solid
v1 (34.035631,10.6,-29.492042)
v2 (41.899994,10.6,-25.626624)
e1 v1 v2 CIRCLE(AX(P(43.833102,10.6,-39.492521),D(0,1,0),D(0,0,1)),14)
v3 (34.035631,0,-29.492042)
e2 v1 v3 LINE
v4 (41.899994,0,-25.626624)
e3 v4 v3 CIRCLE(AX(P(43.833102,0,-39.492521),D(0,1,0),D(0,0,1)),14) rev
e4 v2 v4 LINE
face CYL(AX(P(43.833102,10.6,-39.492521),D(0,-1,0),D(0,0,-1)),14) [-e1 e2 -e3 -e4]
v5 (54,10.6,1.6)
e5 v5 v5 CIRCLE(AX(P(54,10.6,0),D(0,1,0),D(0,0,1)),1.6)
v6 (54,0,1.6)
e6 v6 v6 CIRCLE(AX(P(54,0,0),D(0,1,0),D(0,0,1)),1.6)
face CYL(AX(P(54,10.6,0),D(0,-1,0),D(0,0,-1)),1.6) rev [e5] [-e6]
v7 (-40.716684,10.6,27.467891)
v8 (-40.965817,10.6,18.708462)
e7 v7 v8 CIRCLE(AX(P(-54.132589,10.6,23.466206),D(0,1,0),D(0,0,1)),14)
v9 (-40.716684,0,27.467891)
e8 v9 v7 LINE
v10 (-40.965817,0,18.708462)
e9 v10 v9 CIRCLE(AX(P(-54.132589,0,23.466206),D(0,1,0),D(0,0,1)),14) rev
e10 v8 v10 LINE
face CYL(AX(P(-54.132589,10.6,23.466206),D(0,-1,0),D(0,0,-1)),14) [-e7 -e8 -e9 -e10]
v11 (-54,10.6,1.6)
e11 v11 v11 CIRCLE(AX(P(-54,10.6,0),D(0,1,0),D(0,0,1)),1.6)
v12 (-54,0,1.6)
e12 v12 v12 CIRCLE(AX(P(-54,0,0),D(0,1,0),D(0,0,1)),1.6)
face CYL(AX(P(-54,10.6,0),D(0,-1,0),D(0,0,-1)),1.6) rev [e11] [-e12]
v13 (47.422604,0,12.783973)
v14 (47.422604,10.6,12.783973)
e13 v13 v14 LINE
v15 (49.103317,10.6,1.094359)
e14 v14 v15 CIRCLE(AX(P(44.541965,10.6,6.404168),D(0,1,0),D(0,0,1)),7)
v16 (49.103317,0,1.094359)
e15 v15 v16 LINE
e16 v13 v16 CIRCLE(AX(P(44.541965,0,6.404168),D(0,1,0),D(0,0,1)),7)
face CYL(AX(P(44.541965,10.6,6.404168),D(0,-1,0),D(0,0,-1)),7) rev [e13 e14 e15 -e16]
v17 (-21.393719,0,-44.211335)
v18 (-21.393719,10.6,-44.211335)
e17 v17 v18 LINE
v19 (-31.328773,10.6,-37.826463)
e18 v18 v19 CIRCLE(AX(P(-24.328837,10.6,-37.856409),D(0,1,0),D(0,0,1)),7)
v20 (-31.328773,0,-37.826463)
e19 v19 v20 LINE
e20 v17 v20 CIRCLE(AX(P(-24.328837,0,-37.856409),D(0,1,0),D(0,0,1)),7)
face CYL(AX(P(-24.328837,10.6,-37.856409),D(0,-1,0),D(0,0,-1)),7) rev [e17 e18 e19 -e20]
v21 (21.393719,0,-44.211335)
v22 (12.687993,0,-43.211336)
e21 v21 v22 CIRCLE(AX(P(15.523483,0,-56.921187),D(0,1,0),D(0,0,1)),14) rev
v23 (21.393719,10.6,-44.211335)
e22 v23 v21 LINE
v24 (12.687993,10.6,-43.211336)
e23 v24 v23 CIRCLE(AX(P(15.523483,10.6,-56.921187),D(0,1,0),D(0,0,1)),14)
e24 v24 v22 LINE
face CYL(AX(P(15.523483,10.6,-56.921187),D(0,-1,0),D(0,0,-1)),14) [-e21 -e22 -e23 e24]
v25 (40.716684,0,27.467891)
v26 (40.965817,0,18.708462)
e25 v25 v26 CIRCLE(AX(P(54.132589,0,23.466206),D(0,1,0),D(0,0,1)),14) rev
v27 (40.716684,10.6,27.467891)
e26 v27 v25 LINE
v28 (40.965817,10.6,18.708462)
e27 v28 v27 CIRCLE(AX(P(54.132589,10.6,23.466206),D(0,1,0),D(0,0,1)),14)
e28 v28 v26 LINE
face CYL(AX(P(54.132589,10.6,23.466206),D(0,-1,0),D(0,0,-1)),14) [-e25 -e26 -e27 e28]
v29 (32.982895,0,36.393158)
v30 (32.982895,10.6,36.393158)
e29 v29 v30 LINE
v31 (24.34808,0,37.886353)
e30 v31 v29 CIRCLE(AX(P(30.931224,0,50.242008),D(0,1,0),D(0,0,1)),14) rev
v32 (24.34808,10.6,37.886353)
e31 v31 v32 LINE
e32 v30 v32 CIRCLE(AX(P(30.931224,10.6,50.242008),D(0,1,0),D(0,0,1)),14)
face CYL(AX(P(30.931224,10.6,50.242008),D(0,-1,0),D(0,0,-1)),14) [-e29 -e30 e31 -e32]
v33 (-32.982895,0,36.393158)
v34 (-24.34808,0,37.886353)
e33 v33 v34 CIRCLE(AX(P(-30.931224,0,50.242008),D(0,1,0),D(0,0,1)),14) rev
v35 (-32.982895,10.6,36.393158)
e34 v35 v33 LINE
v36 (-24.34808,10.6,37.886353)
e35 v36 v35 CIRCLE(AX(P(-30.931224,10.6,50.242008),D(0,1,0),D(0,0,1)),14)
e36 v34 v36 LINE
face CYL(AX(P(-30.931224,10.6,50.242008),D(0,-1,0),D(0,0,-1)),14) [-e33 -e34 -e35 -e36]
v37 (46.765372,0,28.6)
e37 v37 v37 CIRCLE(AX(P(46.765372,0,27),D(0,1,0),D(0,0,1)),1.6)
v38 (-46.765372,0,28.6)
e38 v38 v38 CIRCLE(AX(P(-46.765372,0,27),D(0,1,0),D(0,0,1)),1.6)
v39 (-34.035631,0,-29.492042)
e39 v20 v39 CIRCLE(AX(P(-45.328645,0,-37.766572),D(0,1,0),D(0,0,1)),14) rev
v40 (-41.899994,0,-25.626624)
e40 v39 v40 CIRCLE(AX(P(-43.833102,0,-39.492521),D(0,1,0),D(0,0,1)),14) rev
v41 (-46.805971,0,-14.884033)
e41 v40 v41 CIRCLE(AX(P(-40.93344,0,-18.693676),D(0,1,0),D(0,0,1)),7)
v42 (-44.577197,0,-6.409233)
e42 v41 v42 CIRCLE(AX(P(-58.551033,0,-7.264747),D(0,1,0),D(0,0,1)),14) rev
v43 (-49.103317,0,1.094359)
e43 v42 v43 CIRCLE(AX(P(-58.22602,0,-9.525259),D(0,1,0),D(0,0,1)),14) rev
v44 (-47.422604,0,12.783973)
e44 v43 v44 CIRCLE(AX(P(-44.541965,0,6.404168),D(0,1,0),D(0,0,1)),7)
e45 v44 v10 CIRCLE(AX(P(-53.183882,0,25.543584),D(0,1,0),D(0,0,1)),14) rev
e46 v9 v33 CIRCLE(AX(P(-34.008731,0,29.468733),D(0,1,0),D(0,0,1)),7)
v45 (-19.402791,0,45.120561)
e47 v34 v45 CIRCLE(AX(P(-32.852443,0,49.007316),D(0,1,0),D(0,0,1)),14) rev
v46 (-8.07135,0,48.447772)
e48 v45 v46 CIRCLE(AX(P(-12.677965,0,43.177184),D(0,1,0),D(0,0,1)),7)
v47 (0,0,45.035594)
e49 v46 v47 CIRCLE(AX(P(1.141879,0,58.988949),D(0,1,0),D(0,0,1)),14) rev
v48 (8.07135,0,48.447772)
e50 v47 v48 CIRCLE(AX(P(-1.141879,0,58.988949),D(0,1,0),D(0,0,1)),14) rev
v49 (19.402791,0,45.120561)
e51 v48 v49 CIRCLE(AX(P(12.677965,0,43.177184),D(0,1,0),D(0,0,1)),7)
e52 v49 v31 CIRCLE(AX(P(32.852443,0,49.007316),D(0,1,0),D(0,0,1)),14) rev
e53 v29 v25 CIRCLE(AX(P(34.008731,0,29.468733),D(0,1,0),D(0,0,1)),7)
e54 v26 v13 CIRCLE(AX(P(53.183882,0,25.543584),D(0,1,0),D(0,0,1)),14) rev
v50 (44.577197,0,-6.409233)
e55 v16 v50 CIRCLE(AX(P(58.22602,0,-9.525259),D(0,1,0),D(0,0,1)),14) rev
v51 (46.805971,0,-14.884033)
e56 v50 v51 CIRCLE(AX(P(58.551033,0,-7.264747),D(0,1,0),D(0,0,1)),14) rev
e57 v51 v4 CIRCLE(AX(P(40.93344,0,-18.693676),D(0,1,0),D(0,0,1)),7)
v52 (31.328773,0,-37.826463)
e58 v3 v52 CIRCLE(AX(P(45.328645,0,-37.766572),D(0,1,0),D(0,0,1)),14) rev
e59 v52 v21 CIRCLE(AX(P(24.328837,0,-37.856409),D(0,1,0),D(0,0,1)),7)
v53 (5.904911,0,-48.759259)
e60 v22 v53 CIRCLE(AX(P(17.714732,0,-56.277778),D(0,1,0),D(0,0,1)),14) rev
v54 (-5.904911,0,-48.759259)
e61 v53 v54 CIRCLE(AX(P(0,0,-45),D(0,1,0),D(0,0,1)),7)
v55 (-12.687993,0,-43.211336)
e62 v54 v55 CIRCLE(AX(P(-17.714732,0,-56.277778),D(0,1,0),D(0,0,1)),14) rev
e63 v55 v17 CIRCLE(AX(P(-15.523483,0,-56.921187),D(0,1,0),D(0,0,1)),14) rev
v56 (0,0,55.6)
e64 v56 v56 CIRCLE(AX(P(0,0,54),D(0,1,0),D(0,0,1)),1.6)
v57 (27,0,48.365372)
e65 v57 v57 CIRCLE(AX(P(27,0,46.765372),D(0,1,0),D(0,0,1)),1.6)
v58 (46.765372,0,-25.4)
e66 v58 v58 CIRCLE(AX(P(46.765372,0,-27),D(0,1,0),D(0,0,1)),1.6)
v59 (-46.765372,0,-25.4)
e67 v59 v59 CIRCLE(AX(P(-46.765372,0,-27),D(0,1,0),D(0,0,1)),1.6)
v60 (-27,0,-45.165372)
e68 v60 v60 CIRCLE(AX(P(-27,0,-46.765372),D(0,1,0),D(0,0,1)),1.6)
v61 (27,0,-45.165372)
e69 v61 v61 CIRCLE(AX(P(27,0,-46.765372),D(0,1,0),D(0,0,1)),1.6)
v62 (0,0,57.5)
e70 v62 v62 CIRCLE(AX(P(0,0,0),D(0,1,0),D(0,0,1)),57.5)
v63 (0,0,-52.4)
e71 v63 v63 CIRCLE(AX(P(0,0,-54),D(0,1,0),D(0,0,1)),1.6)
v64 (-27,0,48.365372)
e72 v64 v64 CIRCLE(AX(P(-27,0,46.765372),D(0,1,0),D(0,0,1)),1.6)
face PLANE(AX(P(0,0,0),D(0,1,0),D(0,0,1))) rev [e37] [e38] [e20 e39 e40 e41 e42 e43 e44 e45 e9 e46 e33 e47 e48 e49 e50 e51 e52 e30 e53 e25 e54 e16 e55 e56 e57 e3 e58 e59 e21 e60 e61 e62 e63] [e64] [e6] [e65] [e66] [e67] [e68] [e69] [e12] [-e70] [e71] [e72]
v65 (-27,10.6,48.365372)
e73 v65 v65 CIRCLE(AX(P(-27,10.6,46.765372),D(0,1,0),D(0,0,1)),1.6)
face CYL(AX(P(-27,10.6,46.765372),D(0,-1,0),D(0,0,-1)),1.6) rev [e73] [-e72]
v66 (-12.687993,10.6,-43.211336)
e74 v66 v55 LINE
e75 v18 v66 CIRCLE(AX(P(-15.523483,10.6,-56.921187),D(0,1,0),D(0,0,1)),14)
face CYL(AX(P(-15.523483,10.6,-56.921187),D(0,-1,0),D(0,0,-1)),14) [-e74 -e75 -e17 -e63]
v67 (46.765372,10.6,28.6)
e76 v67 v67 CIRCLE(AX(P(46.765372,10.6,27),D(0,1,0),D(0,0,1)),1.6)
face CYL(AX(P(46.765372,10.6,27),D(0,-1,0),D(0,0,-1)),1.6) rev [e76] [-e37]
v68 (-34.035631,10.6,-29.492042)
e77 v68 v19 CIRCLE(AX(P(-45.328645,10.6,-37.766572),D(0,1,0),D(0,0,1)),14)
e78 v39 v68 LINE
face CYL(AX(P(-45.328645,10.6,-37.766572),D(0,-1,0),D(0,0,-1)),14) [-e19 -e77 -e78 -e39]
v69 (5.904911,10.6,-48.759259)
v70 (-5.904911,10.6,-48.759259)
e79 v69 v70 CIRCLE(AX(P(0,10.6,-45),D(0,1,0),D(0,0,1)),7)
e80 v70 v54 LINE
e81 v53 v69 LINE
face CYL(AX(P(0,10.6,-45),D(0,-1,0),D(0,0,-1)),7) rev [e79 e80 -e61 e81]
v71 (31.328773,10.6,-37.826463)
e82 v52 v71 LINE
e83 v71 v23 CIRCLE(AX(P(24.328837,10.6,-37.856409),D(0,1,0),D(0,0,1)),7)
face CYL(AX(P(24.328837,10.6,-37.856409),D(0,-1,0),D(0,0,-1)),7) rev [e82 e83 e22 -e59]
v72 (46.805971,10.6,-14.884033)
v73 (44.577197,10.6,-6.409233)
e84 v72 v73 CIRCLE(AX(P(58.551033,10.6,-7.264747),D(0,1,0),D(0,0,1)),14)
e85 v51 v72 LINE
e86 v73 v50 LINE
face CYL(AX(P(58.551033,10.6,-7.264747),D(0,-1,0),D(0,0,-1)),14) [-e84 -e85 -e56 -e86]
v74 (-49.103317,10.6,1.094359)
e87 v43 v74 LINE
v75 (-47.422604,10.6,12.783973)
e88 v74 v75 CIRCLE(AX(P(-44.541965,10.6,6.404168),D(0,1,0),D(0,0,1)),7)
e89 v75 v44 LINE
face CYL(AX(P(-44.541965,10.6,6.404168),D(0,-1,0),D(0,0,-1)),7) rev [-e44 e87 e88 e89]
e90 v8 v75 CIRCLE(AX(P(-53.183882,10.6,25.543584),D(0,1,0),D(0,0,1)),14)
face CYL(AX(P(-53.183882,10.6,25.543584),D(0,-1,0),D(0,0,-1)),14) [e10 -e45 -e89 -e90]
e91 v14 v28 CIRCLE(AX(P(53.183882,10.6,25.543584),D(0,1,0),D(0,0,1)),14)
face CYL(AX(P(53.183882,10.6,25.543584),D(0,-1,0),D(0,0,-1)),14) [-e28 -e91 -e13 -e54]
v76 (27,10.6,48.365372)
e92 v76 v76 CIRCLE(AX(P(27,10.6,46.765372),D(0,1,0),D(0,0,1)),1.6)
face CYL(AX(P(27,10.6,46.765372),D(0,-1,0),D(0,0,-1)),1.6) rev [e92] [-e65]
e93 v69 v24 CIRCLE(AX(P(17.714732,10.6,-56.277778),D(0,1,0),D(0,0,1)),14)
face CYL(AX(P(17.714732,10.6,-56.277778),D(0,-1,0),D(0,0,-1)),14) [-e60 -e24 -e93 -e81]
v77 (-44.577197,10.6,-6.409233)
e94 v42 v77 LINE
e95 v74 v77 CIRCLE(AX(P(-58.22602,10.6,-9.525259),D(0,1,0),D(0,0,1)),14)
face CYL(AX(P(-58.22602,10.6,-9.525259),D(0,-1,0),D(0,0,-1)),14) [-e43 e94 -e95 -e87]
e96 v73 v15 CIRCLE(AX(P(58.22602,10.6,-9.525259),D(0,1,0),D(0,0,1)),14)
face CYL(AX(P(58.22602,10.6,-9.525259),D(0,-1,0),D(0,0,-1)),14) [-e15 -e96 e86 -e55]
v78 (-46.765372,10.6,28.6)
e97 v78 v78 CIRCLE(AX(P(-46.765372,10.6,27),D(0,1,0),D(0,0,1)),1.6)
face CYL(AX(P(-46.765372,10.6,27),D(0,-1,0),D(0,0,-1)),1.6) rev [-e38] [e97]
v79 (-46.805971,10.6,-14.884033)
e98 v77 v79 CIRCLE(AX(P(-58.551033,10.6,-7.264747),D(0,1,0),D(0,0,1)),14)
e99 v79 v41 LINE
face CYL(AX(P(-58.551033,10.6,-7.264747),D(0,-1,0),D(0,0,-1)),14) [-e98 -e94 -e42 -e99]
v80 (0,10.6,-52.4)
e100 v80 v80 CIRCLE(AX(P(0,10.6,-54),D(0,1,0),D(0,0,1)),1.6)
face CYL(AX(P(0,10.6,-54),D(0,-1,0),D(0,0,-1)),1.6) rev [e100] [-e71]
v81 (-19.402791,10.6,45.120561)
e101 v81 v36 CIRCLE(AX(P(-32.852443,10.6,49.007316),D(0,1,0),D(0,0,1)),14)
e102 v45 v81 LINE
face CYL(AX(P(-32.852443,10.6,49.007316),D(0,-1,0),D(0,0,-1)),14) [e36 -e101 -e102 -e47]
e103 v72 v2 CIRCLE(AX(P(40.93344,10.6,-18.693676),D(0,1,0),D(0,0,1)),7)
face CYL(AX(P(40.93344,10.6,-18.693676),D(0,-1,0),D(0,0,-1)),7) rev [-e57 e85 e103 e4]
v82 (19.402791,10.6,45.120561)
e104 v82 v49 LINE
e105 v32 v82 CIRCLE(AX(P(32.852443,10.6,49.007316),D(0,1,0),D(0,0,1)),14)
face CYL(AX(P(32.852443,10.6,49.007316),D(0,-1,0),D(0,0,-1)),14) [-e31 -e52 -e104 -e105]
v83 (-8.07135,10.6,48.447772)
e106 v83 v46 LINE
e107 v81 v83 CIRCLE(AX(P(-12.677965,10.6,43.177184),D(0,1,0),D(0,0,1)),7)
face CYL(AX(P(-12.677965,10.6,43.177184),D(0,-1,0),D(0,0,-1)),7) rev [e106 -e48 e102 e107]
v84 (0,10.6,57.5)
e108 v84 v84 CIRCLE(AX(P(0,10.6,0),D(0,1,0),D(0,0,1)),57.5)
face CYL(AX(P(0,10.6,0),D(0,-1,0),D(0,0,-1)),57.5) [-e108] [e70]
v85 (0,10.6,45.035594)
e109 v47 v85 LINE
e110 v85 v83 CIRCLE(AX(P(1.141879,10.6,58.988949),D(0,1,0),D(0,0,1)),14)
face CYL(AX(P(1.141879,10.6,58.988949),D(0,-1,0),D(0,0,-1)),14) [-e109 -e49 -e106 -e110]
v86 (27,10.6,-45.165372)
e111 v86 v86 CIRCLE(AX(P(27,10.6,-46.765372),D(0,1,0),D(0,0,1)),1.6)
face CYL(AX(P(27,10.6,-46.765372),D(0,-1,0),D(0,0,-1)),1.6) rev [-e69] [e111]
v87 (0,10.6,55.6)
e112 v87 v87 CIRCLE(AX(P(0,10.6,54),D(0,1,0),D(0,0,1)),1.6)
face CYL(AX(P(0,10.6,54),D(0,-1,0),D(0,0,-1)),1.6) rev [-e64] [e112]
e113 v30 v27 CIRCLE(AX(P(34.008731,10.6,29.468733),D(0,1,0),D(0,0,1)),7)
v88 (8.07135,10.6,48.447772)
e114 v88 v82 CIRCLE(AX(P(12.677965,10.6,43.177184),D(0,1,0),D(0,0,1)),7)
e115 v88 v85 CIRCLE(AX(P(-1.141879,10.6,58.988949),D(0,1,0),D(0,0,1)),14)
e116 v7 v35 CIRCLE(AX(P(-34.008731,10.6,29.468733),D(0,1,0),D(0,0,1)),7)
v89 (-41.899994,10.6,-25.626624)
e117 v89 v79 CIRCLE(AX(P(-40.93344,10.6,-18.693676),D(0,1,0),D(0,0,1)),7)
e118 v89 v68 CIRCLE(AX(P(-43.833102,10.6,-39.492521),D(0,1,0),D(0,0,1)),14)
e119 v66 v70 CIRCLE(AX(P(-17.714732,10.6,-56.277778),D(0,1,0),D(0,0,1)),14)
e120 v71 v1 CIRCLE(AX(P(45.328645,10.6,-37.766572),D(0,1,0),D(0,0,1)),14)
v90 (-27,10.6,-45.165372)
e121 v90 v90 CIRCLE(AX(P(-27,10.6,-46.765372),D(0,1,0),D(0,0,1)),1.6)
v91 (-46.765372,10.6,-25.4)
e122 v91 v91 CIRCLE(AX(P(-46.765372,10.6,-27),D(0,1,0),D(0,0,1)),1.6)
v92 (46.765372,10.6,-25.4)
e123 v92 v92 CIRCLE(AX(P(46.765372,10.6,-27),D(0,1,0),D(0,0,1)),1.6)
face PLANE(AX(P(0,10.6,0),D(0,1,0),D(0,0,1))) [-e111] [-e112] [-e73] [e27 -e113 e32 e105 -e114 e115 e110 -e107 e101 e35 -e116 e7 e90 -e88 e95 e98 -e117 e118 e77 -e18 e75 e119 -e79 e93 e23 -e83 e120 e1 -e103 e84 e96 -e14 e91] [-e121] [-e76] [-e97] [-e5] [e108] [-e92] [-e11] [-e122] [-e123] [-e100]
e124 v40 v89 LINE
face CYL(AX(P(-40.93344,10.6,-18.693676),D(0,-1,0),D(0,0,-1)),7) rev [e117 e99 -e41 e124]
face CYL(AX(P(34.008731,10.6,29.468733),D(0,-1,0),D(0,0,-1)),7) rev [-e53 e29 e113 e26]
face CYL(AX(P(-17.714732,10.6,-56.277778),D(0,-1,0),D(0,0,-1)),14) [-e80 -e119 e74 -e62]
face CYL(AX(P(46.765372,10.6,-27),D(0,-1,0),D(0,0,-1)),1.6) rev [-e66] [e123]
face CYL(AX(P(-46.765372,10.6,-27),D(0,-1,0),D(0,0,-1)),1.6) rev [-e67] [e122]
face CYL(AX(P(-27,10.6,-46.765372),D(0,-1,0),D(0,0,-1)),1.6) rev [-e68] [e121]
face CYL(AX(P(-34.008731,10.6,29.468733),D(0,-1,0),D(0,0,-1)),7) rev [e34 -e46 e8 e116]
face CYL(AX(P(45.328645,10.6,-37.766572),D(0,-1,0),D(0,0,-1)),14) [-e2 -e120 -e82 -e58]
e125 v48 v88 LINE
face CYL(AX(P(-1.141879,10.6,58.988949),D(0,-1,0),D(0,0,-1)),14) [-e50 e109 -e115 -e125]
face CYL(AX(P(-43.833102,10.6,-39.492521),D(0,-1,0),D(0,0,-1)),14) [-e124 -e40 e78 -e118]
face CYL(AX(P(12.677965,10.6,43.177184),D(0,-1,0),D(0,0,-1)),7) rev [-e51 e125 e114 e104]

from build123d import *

# Parameters (mm, degrees)
SKETCH1_R           = 57.5
SKETCH1_R_2         = 1.6
BOSS_EXTRUDE1_DEPTH = 10.6
FILLET1_R           = 14


with BuildPart() as part:
    # Sketch1 → Boss-Extrude1 (new body)
    with BuildSketch(Plane(origin=(0, 0, 0), x_dir=(1, 0, 0), z_dir=(0, 1, 0))):
        with Locations(Location((0, 0, 0), (0, 0, 270))):
            Circle(SKETCH1_R)
        with Locations(Location((-27, -46.765371804, 0), (0, 0, 270))):
            Circle(SKETCH1_R_2, mode=Mode.SUBTRACT)
        with Locations(Location((-46.765371804, -27, 0), (0, 0, 270))):
            Circle(SKETCH1_R_2, mode=Mode.SUBTRACT)
        with Locations(Location((-54, 0, 0), (0, 0, 270))):
            Circle(SKETCH1_R_2, mode=Mode.SUBTRACT)
        with Locations(Location((0, -54, 0), (0, 0, 270))):
            Circle(SKETCH1_R_2, mode=Mode.SUBTRACT)
        with Locations(Location((27, -46.765371804, 0), (0, 0, 270))):
            Circle(SKETCH1_R_2, mode=Mode.SUBTRACT)
        with Locations(Location((46.765371804, -27, 0), (0, 0, 270))):
            Circle(SKETCH1_R_2, mode=Mode.SUBTRACT)
        with Locations(Location((-46.765371804, 27, 0), (0, 0, 270))):
            Circle(SKETCH1_R_2, mode=Mode.SUBTRACT)
        with Locations(Location((-27, 46.765371804, 0), (0, 0, 270))):
            Circle(SKETCH1_R_2, mode=Mode.SUBTRACT)
        with BuildLine():
            ThreePointArc((43.337291938, 12.119369929), (44.541964885, 6.404167722), (44.996248187, 0.581075772))
            ThreePointArc((44.996248187, 0.581075772), (49.649801174, -1.617727663), (51.541964885, -6.404167722))
            ThreePointArc((51.541964885, -6.404167722), (48.916629323, -11.868809619), (43.009876012, -13.234446171))
            ThreePointArc((43.009876012, -13.234446171), (40.933439791, -18.693675585), (38.167406032, -23.837976356))
            ThreePointArc((38.167406032, -23.837976356), (40.258159872, -26.3152212), (41.008730846, -29.468733028))
            ThreePointArc((41.008730846, -29.468733028), (36.666623102, -35.944503928), (29.027128345, -34.386419122))
            ThreePointArc((29.027128345, -34.386419122), (24.328836786, -37.856408977), (19.22068214, -40.688639423))
            ThreePointArc((19.22068214, -40.688639423), (19.562695248, -41.91207899), (19.677965058, -43.177183813))
            ThreePointArc((19.677965058, -43.177183813), (13.403758509, -50.139455271), (5.828472525, -44.620946965))
            ThreePointArc((5.828472525, -44.620946965), (0, -45), (-5.828472525, -44.620946965))
            ThreePointArc((-5.828472525, -44.620946965), (-14.650092956, -49.893634628), (-19.22068214, -40.688639423))
            ThreePointArc((-19.22068214, -40.688639423), (-24.328836785, -37.856408977), (-29.027128345, -34.386419122))
            ThreePointArc((-29.027128345, -34.386419122), (-39.298977866, -34.052758165), (-38.167406032, -23.837976356))
            ThreePointArc((-38.167406032, -23.837976356), (-40.933439791, -18.693675585), (-43.009876012, -13.234446171))
            ThreePointArc((-43.009876012, -13.234446171), (-51.470714978, -7.40037159), (-44.996248187, 0.581075772))
            ThreePointArc((-44.996248187, 0.581075772), (-44.541964885, 6.404167722), (-43.337291938, 12.119369929))
            ThreePointArc((-43.337291938, 12.119369929), (-47.300863758, 21.601580676), (-37.539099471, 24.815640449))
            ThreePointArc((-37.539099471, 24.815640449), (-34.008730846, 29.468733028), (-29.905423881, 33.625371708))
            ThreePointArc((-29.905423881, 33.625371708), (-28.113322508, 43.745183707), (-18.163551911, 41.171414622))
            ThreePointArc((-18.163551911, 41.171414622), (-12.677965058, 43.177183813), (-6.978795043, 44.455555556))
            ThreePointArc((-6.978795043, 44.455555556), (-0.272428616, 51.994696752), (7, 45))
            ThreePointArc((7, 45), (6.994696752, 44.727571384), (6.978795043, 44.455555556))
            ThreePointArc((6.978795043, 44.455555556), (12.677965058, 43.177183813), (18.163551911, 41.171414622))
            ThreePointArc((18.163551911, 41.171414622), (26.038077243, 44.644523374), (31.328836786, 37.856408977))
            ThreePointArc((31.328836786, 37.856408977), (30.963447161, 35.624381834), (29.905423881, 33.625371708))
            ThreePointArc((29.905423881, 33.625371708), (34.008730846, 29.468733028), (37.539099471, 24.815640449))
            ThreePointArc((37.539099471, 24.815640449), (44.485876825, 24.725274968), (47.933439791, 18.693675585))
            ThreePointArc((47.933439791, 18.693675585), (46.670467115, 14.68287548), (43.337291938, 12.119369929))
        make_face(mode=Mode.SUBTRACT)
        with Locations(Location((54, 0, 0), (0, 0, 270))):
            Circle(SKETCH1_R_2, mode=Mode.SUBTRACT)
        with Locations(Location((46.765371804, 27, 0), (0, 0, 270))):
            Circle(SKETCH1_R_2, mode=Mode.SUBTRACT)
        with Locations(Location((0, 54, 0), (0, 0, 270))):
            Circle(SKETCH1_R_2, mode=Mode.SUBTRACT)
        with Locations(Location((27, 46.765371804, 0), (0, 0, 270))):
            Circle(SKETCH1_R_2, mode=Mode.SUBTRACT)
    extrude(amount=BOSS_EXTRUDE1_DEPTH)

    # Fillet1
    # the kernel refuses this fillet: 14 mm, written as the material it takes off along each edge
    with BuildSketch(Plane(origin=(43.009876012, -16.77410228, 13.234446171), x_dir=(-0.3645348982341331, 0, 0.9311897271605987), z_dir=(0, 1, 0)), Plane(origin=(43.337291938, -16.77410228, -12.119369929), x_dir=(0.19677290431862063, 0, 0.9804490930823564), z_dir=(0, 1, 0)), Plane(origin=(29.027128345, -16.77410228, 34.386419122), x_dir=(-0.8101054462780665, 0, 0.586284202337582), z_dir=(0, 1, 0)), Plane(origin=(5.828472525, -16.77410228, 44.620946965), x_dir=(-0.9984732390602963, 0, 0.05523758575861507), z_dir=(0, 1, 0)), Plane(origin=(-19.22068214, -16.77410228, 40.688639423), x_dir=(-0.8698328333156817, 0, -0.4933465740085904), z_dir=(0, 1, 0)), Plane(origin=(-38.167406032, -16.77410228, 23.837976356), x_dir=(-0.46502664893844664, 0, -0.8852966823483972), z_dir=(0, 1, 0)), Plane(origin=(-44.996248187, -16.77410228, -0.581075772), x_dir=(0.0874222107554752, 0, -0.99617134925003), z_dir=(0, 1, 0)), Plane(origin=(-37.539099471, -16.77410228, -24.815640449), x_dir=(0.6121151362303556, 0, -0.7907686513751624), z_dir=(0, 1, 0)), Plane(origin=(-18.163551911, -16.77410228, -41.171414622), x_dir=(0.9424658309509625, 0, -0.334302493992958), z_dir=(0, 1, 0)), Plane(origin=(6.978795043, -16.77410228, -44.455555556), x_dir=(0.9735902834899675, 0, 0.22830234316345693), z_dir=(0, 1, 0))) as fillet1_piece_1:
        with BuildLine():
            CenterArc((7.753362832, 13.961040239), FILLET1_R, 225.679308165, 40.045235058)
            ThreePointArc((-2.028069047, 3.944873787), (-0.693306264, 2.137324059), (0, 0))
            ThreePointArc((0, 0), (3.354820456, 0.125227803), (6.709640912, 0))
        make_face()
    extrude(amount=44.14820456, mode=Mode.SUBTRACT)
    with BuildSketch(Plane(origin=(44.996248187, -16.77410228, -0.581075772), x_dir=(0.9259201789863998, 0, 0.37771923719317424), z_dir=(0, 1, 0)), Plane(origin=(37.539099471, -16.77410228, -24.815640449), x_dir=(0.9831440588568181, 0, -0.18283259975874497), z_dir=(0, 1, 0)), Plane(origin=(38.167406032, -16.77410228, 23.837976356), x_dir=(0.5747231845271455, 0, 0.8183478851729116), z_dir=(0, 1, 0)), Plane(origin=(19.22068214, -16.77410228, 40.688639423), x_dir=(0.041055639780420296, 0, 0.9991568617800813), z_dir=(0, 1, 0)), Plane(origin=(-5.828472525, -16.77410228, 44.620946965), x_dir=(-0.5056467805113274, 0, 0.8627405944770012), z_dir=(0, 1, 0)), Plane(origin=(-29.027128345, -16.77410228, 34.386419122), x_dir=(-0.8918099207200904, 0, 0.4524102842611189), z_dir=(0, 1, 0)), Plane(origin=(-43.009876012, -16.77410228, 13.234446171), x_dir=(-0.994829712327915, 0, -0.10155709462936494), z_dir=(0, 1, 0)), Plane(origin=(-43.337291938, -16.77410228, -12.119369929), x_dir=(-0.7819980994024467, 0, -0.62328081354311), z_dir=(0, 1, 0)), Plane(origin=(-29.905423881, -16.77410228, -33.625371708), x_dir=(-0.3208876152512941, 0, -0.9471172780486783), z_dir=(0, 1, 0)), Plane(origin=(18.163551911, -16.77410228, -41.171414622), x_dir=(0.7282266466043301, 0, -0.6853363781205636), z_dir=(0, 1, 0)), Plane(origin=(-6.978795043, -16.77410228, -44.455555556), x_dir=(0.24210241945853378, 0, -0.9702506987847646), z_dir=(0, 1, 0))) as fillet1_piece_2:
        with BuildLine():
            CenterArc((8.87132307, 13.278738899), FILLET1_R, 211.483261097, 40.045235058)
            ThreePointArc((-3.067775786, 5.967246676), (-1.422516032, 3.040879878), (0, 0))
            ThreePointArc((0, 0), (2.217830767, 0.36063055), (4.435661535, 0))
        make_face()
    extrude(amount=44.14820456, mode=Mode.SUBTRACT)
    with BuildSketch(Plane(origin=(29.905423881, -16.77410228, -33.625371708), x_dir=(0.3208876152513925, 0, -0.9471172780486449), z_dir=(0, 1, 0))) as fillet1_piece_3:
        with BuildLine():
            CenterArc((8.87132307, -13.278738899), FILLET1_R, 108.471503845, 40.045235058)
            ThreePointArc((-3.067775786, -5.967246676), (-1.422516032, -3.040879878), (0, 0))
            ThreePointArc((0, 0), (2.217830767, -0.36063055), (4.435661535, 0))
        make_face()
    extrude(amount=44.14820456, mode=Mode.SUBTRACT)


solid = part.part
